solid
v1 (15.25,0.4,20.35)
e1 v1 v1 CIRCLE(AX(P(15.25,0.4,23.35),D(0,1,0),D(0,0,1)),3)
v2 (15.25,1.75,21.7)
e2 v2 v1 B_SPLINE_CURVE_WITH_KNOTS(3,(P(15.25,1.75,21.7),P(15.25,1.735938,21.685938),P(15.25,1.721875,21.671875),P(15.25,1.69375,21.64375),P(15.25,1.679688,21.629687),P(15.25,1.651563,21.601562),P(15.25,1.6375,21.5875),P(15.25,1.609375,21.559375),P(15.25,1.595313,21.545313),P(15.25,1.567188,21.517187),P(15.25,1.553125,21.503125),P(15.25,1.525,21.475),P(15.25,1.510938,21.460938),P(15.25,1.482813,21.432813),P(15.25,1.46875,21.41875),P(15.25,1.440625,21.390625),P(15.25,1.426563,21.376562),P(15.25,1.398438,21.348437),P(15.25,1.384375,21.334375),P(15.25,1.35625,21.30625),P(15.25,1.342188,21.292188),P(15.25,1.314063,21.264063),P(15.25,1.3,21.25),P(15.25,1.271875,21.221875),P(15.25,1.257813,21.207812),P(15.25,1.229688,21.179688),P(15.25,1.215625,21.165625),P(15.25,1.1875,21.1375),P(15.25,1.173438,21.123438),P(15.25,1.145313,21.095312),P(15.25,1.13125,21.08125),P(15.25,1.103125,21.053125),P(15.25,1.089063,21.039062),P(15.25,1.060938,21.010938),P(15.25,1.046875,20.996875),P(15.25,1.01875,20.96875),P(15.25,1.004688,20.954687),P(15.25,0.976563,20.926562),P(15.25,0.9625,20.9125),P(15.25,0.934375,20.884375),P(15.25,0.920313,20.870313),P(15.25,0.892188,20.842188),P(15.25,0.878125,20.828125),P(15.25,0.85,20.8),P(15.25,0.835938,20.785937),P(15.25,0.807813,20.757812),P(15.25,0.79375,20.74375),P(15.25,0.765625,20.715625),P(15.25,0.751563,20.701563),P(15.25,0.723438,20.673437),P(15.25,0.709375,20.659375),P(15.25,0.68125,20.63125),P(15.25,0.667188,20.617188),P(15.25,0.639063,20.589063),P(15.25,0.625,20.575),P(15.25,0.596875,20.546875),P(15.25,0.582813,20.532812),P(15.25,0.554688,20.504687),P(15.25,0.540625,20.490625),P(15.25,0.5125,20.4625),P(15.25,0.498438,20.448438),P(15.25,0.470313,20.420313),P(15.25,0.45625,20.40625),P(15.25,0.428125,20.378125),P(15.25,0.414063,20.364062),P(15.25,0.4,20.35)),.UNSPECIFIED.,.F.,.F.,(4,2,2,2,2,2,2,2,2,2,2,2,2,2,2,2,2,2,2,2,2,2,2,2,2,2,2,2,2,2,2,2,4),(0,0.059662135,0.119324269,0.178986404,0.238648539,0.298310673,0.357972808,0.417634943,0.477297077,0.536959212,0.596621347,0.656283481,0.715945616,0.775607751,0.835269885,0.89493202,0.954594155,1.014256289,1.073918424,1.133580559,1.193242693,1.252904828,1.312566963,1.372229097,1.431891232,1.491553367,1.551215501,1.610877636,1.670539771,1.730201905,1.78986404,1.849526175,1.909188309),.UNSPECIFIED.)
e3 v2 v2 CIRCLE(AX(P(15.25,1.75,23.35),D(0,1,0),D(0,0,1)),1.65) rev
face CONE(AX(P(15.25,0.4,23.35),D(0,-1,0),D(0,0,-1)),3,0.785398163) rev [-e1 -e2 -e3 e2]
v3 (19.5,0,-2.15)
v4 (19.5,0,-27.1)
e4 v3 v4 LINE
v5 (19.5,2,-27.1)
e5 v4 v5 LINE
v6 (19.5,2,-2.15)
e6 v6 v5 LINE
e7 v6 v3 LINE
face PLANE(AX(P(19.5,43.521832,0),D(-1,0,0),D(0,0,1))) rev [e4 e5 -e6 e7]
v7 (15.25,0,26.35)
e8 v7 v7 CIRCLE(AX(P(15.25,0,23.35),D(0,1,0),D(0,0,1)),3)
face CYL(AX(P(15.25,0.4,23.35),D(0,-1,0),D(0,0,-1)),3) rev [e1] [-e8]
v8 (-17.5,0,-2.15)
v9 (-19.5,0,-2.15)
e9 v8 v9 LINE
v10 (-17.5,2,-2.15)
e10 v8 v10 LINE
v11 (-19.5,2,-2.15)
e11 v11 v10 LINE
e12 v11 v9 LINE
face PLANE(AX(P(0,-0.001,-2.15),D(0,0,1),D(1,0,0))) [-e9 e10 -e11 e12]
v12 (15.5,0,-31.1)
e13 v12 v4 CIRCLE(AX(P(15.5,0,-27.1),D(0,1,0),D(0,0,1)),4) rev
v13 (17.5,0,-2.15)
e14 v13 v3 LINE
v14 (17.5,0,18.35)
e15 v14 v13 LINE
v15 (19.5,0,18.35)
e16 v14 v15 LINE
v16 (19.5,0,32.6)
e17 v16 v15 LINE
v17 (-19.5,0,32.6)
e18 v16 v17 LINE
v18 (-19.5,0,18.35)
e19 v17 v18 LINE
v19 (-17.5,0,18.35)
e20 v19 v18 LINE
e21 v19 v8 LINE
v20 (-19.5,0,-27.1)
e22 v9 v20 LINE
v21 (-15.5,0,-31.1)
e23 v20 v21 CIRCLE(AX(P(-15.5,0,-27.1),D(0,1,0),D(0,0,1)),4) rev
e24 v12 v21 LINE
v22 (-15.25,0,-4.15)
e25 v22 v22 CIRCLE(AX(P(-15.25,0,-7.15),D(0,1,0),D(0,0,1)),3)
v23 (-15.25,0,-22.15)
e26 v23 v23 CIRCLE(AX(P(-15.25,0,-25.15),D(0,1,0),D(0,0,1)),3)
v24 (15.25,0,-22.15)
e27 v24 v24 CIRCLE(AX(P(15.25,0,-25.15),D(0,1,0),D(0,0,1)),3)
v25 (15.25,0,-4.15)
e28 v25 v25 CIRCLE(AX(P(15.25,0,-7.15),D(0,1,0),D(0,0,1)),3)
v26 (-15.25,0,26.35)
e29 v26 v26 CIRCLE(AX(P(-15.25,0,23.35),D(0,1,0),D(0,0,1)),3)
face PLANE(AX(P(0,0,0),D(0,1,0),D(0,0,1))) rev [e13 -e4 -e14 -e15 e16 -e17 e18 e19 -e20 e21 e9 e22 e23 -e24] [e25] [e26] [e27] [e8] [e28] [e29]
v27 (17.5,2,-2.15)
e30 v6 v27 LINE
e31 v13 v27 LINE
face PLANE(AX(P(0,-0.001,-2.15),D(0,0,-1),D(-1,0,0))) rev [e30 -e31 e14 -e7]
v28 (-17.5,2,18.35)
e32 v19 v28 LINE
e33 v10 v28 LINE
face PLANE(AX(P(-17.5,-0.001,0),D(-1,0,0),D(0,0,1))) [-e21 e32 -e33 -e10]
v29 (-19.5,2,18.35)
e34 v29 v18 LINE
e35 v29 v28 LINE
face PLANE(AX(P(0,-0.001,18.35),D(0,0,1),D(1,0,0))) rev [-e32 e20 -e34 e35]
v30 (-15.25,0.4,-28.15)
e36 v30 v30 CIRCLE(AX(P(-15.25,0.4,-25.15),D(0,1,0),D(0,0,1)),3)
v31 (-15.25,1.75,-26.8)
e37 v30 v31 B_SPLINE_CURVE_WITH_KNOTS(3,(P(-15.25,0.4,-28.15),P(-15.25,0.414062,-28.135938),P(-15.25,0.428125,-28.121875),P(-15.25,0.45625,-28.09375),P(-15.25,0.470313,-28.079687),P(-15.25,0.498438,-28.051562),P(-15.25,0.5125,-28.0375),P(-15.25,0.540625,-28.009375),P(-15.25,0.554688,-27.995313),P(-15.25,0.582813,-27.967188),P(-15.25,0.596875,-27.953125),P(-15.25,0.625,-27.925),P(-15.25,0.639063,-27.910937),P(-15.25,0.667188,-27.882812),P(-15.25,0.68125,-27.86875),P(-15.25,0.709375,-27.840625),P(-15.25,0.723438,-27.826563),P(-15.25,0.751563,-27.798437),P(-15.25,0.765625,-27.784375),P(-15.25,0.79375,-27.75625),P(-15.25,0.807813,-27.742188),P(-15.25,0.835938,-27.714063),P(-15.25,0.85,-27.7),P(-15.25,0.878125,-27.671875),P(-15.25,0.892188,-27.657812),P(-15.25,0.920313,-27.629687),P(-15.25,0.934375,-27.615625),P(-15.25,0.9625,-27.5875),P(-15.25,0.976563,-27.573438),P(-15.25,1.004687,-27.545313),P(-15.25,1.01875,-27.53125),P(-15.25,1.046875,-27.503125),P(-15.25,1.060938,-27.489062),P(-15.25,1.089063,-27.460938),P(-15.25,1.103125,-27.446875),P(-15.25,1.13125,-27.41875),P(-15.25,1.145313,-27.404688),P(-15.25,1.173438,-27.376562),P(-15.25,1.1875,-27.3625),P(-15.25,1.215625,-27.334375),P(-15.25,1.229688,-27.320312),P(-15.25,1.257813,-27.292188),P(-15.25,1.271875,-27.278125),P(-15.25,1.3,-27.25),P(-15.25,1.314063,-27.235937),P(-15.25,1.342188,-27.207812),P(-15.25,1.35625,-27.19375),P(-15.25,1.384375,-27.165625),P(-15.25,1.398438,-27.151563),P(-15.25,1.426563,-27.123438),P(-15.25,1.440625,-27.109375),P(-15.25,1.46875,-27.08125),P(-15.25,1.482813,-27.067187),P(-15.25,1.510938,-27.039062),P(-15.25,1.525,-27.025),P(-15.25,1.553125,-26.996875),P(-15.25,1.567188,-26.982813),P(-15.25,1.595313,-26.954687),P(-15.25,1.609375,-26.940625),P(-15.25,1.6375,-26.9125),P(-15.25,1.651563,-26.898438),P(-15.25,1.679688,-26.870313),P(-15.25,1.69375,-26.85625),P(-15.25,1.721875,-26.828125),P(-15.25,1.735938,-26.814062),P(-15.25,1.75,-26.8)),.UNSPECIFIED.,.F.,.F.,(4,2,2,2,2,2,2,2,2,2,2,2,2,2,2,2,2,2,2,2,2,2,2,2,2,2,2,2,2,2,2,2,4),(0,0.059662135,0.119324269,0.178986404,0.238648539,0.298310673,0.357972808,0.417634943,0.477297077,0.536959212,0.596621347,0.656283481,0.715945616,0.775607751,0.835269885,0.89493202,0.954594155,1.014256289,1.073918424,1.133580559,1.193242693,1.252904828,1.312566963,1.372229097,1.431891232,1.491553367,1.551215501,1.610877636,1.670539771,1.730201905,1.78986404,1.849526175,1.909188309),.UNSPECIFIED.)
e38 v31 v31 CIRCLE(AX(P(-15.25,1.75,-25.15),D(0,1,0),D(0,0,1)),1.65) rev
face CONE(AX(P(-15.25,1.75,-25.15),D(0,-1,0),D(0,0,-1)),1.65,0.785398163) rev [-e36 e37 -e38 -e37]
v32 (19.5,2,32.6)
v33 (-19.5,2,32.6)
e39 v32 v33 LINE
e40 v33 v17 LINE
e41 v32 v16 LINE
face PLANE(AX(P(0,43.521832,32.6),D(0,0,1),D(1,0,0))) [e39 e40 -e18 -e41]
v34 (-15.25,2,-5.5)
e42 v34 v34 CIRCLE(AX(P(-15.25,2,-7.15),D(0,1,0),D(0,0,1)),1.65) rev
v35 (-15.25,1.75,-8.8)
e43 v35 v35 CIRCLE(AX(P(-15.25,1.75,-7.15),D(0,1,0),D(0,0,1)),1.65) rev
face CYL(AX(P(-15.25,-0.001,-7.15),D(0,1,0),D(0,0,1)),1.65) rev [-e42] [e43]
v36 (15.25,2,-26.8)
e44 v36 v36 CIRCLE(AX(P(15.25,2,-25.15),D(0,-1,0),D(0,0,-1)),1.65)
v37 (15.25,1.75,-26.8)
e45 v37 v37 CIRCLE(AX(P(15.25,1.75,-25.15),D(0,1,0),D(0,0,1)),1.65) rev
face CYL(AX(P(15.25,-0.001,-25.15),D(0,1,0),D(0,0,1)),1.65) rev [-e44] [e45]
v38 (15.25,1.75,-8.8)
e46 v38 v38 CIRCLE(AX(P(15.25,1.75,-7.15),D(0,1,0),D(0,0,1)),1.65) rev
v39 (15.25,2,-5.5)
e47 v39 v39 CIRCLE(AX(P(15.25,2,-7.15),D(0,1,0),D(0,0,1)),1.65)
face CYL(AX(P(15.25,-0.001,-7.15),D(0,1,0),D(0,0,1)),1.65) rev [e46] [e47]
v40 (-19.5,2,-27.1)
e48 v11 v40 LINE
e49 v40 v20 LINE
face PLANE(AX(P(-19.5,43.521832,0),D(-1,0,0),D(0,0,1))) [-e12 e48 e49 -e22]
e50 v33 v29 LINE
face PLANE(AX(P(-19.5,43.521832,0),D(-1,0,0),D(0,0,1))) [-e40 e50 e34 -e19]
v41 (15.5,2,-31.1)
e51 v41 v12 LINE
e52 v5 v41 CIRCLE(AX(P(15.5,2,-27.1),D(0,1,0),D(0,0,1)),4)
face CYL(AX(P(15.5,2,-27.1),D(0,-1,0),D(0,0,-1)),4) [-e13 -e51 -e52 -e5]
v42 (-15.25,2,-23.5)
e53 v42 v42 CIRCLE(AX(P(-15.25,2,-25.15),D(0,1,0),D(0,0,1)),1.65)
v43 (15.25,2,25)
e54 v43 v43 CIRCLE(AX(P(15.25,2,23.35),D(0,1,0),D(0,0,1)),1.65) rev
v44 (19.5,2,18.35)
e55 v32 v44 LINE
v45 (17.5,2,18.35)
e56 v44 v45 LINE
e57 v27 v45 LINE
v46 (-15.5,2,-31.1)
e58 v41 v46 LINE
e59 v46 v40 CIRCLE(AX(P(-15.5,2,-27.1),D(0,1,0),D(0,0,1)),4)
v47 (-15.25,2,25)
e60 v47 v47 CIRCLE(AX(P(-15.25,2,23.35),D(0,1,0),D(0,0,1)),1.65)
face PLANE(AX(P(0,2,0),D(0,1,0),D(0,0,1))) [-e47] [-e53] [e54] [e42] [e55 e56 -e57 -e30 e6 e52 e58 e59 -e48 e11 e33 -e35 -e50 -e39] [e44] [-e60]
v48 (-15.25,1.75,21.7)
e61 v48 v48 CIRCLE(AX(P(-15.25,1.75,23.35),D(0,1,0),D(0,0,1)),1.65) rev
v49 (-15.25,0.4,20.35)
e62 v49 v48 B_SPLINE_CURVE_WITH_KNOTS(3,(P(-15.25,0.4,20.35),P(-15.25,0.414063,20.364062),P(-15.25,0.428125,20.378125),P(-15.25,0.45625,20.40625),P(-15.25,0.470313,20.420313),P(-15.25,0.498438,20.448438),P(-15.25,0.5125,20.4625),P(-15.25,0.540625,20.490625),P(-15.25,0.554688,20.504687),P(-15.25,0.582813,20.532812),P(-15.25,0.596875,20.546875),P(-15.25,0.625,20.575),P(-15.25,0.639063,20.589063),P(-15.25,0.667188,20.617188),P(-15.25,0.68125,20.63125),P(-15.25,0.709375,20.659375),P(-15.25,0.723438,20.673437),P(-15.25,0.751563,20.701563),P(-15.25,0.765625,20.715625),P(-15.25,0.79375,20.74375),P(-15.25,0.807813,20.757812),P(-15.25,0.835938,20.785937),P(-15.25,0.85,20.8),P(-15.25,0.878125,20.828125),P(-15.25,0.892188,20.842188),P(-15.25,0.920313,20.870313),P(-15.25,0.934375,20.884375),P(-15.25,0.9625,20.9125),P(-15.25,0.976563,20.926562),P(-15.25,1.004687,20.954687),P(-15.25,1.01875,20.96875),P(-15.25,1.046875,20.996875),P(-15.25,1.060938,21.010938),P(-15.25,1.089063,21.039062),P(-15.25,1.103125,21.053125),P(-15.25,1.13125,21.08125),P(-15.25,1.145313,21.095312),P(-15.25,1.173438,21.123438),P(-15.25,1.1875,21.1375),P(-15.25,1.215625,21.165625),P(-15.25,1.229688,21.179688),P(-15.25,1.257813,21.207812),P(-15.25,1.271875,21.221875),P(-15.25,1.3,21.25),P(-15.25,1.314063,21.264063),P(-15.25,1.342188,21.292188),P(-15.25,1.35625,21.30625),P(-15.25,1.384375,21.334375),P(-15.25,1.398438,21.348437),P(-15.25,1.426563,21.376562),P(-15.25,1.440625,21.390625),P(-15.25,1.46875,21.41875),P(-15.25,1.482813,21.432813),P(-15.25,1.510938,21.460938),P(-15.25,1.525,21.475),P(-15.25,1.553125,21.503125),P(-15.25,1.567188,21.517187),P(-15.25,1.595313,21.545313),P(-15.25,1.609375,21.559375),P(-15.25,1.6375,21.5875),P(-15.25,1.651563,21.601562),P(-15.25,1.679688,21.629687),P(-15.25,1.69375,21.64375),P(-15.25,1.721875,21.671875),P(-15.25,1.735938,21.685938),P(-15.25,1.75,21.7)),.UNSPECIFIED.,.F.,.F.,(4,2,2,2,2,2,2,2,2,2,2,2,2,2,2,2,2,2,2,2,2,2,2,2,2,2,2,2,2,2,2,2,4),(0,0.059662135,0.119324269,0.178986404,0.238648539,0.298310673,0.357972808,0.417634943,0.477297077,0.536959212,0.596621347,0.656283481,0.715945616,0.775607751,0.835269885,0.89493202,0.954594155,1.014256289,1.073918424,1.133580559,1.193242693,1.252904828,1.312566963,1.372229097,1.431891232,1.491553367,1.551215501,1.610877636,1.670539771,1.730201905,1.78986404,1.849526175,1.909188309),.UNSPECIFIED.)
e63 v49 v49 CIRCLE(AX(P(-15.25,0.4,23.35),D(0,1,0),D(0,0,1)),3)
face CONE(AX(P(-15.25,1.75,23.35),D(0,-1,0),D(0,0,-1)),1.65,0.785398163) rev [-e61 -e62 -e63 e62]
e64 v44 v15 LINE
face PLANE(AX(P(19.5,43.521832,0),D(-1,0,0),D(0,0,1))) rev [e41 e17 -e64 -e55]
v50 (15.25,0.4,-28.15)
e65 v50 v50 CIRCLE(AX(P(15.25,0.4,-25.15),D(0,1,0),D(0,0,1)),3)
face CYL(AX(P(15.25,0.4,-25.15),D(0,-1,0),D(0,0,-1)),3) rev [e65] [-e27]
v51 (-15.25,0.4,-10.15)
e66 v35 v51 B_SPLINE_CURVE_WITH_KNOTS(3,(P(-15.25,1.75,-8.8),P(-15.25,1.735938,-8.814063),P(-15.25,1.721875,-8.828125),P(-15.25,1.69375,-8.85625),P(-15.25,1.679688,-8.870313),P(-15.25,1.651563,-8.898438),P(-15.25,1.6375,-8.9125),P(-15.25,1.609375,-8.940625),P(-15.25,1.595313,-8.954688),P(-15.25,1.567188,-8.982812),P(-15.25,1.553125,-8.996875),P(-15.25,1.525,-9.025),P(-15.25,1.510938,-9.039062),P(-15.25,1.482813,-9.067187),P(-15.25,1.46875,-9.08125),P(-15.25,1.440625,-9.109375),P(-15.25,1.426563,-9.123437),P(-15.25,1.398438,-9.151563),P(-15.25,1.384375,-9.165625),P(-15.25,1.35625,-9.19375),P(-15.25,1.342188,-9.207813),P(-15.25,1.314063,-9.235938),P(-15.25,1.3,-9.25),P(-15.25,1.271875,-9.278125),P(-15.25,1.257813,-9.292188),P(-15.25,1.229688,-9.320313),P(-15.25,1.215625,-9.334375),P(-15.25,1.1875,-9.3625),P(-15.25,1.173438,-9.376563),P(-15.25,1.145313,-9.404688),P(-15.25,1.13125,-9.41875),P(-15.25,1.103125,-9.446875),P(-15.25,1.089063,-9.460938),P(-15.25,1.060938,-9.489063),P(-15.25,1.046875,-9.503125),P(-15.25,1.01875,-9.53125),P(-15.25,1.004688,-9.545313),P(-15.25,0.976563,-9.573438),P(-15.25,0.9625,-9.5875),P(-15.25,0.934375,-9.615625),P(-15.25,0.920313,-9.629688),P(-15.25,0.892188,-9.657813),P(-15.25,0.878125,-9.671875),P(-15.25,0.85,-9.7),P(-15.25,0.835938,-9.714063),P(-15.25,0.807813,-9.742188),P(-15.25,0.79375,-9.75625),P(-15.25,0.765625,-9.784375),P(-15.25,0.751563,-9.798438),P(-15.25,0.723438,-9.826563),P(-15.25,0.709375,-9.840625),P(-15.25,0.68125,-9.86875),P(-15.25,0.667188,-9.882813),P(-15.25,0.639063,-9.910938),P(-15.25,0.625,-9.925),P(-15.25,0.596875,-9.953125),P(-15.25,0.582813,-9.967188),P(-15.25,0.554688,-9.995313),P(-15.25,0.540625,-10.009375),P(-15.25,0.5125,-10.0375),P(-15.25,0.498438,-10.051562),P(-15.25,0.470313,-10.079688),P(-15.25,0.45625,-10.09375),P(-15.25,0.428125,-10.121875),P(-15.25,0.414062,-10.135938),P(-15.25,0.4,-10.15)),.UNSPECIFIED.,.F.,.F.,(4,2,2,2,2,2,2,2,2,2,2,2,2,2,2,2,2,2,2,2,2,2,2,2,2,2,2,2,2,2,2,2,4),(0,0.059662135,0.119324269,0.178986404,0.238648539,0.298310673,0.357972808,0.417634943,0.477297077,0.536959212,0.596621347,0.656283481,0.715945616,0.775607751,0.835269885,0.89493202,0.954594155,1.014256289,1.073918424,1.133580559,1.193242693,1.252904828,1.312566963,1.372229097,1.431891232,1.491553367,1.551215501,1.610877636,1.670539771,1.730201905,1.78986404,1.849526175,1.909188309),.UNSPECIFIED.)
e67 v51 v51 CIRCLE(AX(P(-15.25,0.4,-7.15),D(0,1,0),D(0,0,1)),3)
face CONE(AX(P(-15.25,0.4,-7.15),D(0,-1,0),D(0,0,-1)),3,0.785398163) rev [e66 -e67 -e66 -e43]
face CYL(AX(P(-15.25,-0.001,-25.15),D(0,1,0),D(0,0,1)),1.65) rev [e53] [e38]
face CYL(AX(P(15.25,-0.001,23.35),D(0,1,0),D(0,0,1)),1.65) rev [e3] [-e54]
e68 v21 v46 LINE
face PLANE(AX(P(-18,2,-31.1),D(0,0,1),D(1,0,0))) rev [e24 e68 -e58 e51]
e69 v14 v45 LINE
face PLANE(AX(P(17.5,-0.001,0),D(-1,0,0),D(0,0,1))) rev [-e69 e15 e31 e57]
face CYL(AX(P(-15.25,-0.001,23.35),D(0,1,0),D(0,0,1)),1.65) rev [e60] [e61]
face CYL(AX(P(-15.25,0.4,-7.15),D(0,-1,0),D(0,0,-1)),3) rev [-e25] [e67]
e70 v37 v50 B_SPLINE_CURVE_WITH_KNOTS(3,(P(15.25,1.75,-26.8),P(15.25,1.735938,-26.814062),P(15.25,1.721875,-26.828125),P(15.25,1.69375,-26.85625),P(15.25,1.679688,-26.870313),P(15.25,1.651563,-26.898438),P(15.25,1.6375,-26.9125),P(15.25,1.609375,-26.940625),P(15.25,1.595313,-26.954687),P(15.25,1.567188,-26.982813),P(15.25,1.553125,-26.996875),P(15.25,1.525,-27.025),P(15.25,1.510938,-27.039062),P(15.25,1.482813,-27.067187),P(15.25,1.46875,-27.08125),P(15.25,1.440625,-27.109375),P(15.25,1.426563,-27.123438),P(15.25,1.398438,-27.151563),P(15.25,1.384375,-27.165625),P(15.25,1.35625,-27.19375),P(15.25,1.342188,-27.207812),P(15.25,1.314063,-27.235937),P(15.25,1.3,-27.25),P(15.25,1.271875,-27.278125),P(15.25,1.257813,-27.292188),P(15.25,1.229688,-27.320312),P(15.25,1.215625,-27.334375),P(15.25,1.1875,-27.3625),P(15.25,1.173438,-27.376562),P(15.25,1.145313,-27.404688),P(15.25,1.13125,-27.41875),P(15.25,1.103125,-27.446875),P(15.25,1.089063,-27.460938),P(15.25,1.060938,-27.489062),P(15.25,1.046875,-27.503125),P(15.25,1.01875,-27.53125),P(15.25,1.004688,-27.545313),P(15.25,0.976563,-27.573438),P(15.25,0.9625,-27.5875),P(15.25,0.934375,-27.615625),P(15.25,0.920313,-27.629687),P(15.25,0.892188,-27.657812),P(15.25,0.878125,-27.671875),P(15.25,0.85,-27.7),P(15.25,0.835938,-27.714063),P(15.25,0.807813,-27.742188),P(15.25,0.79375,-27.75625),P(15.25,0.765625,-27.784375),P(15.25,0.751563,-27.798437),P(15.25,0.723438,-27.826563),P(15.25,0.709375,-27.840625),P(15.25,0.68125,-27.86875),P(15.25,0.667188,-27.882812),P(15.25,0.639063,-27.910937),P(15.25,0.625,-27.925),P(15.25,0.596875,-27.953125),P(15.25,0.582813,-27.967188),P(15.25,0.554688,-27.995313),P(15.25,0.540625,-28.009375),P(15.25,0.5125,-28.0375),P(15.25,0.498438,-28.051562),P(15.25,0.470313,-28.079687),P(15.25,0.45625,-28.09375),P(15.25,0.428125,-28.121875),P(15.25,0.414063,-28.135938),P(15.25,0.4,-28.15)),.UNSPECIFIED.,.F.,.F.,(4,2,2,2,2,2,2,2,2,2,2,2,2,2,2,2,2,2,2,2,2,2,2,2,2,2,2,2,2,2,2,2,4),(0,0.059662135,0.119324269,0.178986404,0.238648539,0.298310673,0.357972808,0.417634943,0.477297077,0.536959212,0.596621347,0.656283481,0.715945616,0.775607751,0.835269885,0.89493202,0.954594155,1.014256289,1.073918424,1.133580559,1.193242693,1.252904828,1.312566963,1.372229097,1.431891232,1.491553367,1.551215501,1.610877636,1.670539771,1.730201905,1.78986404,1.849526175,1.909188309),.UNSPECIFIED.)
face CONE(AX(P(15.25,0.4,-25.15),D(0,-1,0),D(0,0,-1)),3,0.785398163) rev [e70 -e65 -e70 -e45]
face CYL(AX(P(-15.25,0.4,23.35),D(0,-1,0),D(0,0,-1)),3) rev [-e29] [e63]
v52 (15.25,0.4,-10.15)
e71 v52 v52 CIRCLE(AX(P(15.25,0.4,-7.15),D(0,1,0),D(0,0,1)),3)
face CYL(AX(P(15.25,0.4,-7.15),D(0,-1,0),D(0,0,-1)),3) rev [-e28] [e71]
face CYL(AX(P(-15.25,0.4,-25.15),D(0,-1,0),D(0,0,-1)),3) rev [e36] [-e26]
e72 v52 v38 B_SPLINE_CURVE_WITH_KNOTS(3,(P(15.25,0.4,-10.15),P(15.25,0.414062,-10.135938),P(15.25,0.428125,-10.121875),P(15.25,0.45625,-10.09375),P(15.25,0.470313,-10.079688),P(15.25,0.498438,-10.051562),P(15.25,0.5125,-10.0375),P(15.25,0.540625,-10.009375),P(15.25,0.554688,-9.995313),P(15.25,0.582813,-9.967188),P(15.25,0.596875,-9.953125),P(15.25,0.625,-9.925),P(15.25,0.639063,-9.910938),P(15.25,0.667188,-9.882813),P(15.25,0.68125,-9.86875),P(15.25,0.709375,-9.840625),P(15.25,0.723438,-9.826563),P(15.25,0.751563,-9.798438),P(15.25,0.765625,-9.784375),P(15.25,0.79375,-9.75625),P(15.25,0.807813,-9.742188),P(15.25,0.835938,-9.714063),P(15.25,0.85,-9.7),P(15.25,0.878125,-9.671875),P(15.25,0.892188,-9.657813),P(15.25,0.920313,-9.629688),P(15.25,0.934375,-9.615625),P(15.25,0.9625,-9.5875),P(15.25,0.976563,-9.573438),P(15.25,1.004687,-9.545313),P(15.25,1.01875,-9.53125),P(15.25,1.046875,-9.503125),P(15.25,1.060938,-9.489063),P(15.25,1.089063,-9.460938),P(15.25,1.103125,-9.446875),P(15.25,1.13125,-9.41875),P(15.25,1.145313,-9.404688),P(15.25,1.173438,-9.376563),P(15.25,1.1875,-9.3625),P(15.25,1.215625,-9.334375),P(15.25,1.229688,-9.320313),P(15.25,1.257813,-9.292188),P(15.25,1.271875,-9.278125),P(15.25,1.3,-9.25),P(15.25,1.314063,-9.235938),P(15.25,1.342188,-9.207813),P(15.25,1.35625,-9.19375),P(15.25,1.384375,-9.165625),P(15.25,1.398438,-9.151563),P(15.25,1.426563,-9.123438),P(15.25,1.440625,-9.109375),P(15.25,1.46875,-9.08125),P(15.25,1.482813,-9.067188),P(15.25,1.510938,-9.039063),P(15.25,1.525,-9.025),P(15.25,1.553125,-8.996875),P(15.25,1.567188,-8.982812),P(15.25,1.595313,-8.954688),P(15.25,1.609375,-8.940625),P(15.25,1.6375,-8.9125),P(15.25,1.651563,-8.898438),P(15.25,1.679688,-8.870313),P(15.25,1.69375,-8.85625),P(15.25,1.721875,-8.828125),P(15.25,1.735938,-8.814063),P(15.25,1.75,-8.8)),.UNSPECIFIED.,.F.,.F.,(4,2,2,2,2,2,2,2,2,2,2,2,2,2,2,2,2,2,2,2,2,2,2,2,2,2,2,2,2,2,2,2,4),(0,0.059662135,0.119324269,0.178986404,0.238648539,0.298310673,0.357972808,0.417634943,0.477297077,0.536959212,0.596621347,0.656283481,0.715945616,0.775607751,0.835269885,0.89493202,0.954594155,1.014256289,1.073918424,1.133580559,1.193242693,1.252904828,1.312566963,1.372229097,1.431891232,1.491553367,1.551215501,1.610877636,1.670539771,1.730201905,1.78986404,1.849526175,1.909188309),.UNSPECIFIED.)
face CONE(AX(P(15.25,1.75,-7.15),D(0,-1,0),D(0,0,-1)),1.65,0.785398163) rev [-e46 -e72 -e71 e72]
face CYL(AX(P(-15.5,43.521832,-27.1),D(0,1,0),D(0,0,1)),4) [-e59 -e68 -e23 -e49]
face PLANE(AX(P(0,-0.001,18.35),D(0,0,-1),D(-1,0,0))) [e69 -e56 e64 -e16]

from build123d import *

# Parameters (mm, degrees)
SKETCH1_W            = 36
SKETCH1_H            = 62.2
BASE_SHAPE_DEPTH     = 2
CUTOUTS_REACH        = 37.989
SKETCH2_R            = 1.65
SKETCH2_W            = 0.5
SKETCH2_H            = 20.5
SKETCH3_W            = 1.5
SKETCH3_H            = 28.95
SKETCH3_H_2          = 12.75
EXTRA_SIZE_DEPTH     = 2
SKETCH4_R            = 3
SCREW_HEAD_CUT_DEPTH = 0.4
SCREW_CHAMFER_SIZE   = 1.35
FILLET1_R            = 4


with BuildPart() as part:
    # Sketch1 → Base shape (new body)
    with BuildSketch(Plane(origin=(0, 0, 0), x_dir=(1, 0, 0), z_dir=(0, 1, 0))):
        Rectangle(SKETCH1_W, SKETCH1_H)
    extrude(amount=BASE_SHAPE_DEPTH)

    # Sketch2 → Cutouts (cut, up to next)
    with BuildSketch(Plane(origin=(0, 2, 0), x_dir=(1, 0, 0), z_dir=(0, 1, 0)), mode=Mode.PRIVATE) as cutouts_sk1:
        with Locations(Location((-15.25, 7.15, 0), (0, 0, 270))):
            Circle(SKETCH2_R)
    cutouts_tool1 = extrude(cutouts_sk1.sketch, amount=-CUTOUTS_REACH, mode=Mode.PRIVATE) & part.part
    # Sketch2 → Cutouts (cut, up to next)
    with BuildSketch(Plane(origin=(0, 2, 0), x_dir=(1, 0, 0), z_dir=(0, 1, 0)), mode=Mode.PRIVATE) as cutouts_sk2:
        with Locations(Location((15.25, 7.15, 0), (0, 0, 270))):
            Circle(SKETCH2_R)
    cutouts_tool2 = extrude(cutouts_sk2.sketch, amount=-CUTOUTS_REACH, mode=Mode.PRIVATE) & part.part
    # Sketch2 → Cutouts (cut, up to next)
    with BuildSketch(Plane(origin=(0, 2, 0), x_dir=(1, 0, 0), z_dir=(0, 1, 0)), mode=Mode.PRIVATE) as cutouts_sk3:
        with Locations((17.75, -8.1)):
            Rectangle(SKETCH2_W, SKETCH2_H)
    cutouts_tool3 = extrude(cutouts_sk3.sketch, amount=-CUTOUTS_REACH, mode=Mode.PRIVATE) & part.part
    # Sketch2 → Cutouts (cut, up to next)
    with BuildSketch(Plane(origin=(0, 2, 0), x_dir=(1, 0, 0), z_dir=(0, 1, 0)), mode=Mode.PRIVATE) as cutouts_sk4:
        with Locations((-17.75, -8.1)):
            Rectangle(SKETCH2_W, SKETCH2_H)
    cutouts_tool4 = extrude(cutouts_sk4.sketch, amount=-CUTOUTS_REACH, mode=Mode.PRIVATE) & part.part
    # Sketch2 → Cutouts (cut, up to next)
    with BuildSketch(Plane(origin=(0, 2, 0), x_dir=(1, 0, 0), z_dir=(0, 1, 0)), mode=Mode.PRIVATE) as cutouts_sk5:
        with Locations(Location((-15.25, -23.35, 0), (0, 0, 270))):
            Circle(SKETCH2_R)
    cutouts_tool5 = extrude(cutouts_sk5.sketch, amount=-CUTOUTS_REACH, mode=Mode.PRIVATE) & part.part
    # Sketch2 → Cutouts (cut, up to next)
    with BuildSketch(Plane(origin=(0, 2, 0), x_dir=(1, 0, 0), z_dir=(0, 1, 0)), mode=Mode.PRIVATE) as cutouts_sk6:
        with Locations(Location((15.25, -23.35, 0), (0, 0, 270))):
            Circle(SKETCH2_R)
    cutouts_tool6 = extrude(cutouts_sk6.sketch, amount=-CUTOUTS_REACH, mode=Mode.PRIVATE) & part.part
    # Sketch2 → Cutouts (cut, up to next)
    with BuildSketch(Plane(origin=(0, 2, 0), x_dir=(1, 0, 0), z_dir=(0, 1, 0)), mode=Mode.PRIVATE) as cutouts_sk7:
        with Locations(Location((-15.25, 25.15, 0), (0, 0, 270))):
            Circle(SKETCH2_R)
    cutouts_tool7 = extrude(cutouts_sk7.sketch, amount=-CUTOUTS_REACH, mode=Mode.PRIVATE) & part.part
    # Sketch2 → Cutouts (cut, up to next)
    with BuildSketch(Plane(origin=(0, 2, 0), x_dir=(1, 0, 0), z_dir=(0, 1, 0)), mode=Mode.PRIVATE) as cutouts_sk8:
        with Locations(Location((15.25, 25.15, 0), (0, 0, 270))):
            Circle(SKETCH2_R)
    cutouts_tool8 = extrude(cutouts_sk8.sketch, amount=-CUTOUTS_REACH, mode=Mode.PRIVATE) & part.part
    add(cutouts_tool1.solids().sort_by_distance((-15.25, 2, -7.15))[0], mode=Mode.SUBTRACT)
    add(cutouts_tool2.solids().sort_by_distance((15.25, 2, -7.15))[0], mode=Mode.SUBTRACT)
    add(cutouts_tool3.solids().sort_by_distance((17.75, 2, 8.1))[0], mode=Mode.SUBTRACT)
    add(cutouts_tool4.solids().sort_by_distance((-17.75, 2, 8.1))[0], mode=Mode.SUBTRACT)
    add(cutouts_tool5.solids().sort_by_distance((-15.25, 2, 23.35))[0], mode=Mode.SUBTRACT)
    add(cutouts_tool6.solids().sort_by_distance((15.25, 2, 23.35))[0], mode=Mode.SUBTRACT)
    add(cutouts_tool7.solids().sort_by_distance((-15.25, 2, -25.15))[0], mode=Mode.SUBTRACT)
    add(cutouts_tool8.solids().sort_by_distance((15.25, 2, -25.15))[0], mode=Mode.SUBTRACT)

    # Sketch3 → Extra size (add)
    with BuildSketch(Plane.XZ):
        with Locations((-18.75, -16.625)):
            Rectangle(SKETCH3_W, SKETCH3_H)
        with Locations((18.75, -16.625)):
            Rectangle(SKETCH3_W, SKETCH3_H)
        with Locations((-18.75, 24.725)):
            Rectangle(SKETCH3_W, SKETCH3_H_2)
        with Locations((18.75, 24.725)):
            Rectangle(SKETCH3_W, SKETCH3_H_2)
        Polygon((19.5, 31.1), (19.5, 32.6), (-19.5, 32.6), (-19.5, 31.1), (-18, 31.1), (18, 31.1), align=None)
    extrude(amount=-EXTRA_SIZE_DEPTH)

    # Sketch4 → Screw head cut (cut)
    with BuildSketch(Plane(origin=(0, 0, 0), x_dir=(1, 0, 0), z_dir=(0, 1, 0))):
        with Locations(Location((-15.25, 25.15, 0), (0, 0, 270))):
            Circle(SKETCH4_R)
        with Locations(Location((15.25, 25.15, 0), (0, 0, 270))):
            Circle(SKETCH4_R)
        with Locations(Location((15.25, 7.15, 0), (0, 0, 270))):
            Circle(SKETCH4_R)
        with Locations(Location((-15.25, 7.15, 0), (0, 0, 270))):
            Circle(SKETCH4_R)
        with Locations(Location((-15.25, -23.35, 0), (0, 0, 270))):
            Circle(SKETCH4_R)
        with Locations(Location((15.25, -23.35, 0), (0, 0, 270))):
            Circle(SKETCH4_R)
    extrude(amount=SCREW_HEAD_CUT_DEPTH, mode=Mode.SUBTRACT)

    # Screw chamfer
    screw_chamfer_edges = [part.edges().sort_by_distance(p)[0] for p in [
        (-15.25, 0.4, -26.8),
        (15.25, 0.4, 21.7),
        (-15.25, 0.4, 21.7),
        (-15.25, 0.4, -8.8),
        (15.25, 0.4, -8.8),
        (15.25, 0.4, -26.8),
    ]]
    chamfer(screw_chamfer_edges, length=SCREW_CHAMFER_SIZE - 0.0001)  # a hair under: the kernel refuses the full size

    # Fillet1
    fillet1_edges = [part.edges().sort_by_distance(p)[0] for p in [
        (-19.5, 1, -31.1),
        (19.5, 1, -31.1),
    ]]
    fillet(fillet1_edges, radius=FILLET1_R)


solid = part.part
